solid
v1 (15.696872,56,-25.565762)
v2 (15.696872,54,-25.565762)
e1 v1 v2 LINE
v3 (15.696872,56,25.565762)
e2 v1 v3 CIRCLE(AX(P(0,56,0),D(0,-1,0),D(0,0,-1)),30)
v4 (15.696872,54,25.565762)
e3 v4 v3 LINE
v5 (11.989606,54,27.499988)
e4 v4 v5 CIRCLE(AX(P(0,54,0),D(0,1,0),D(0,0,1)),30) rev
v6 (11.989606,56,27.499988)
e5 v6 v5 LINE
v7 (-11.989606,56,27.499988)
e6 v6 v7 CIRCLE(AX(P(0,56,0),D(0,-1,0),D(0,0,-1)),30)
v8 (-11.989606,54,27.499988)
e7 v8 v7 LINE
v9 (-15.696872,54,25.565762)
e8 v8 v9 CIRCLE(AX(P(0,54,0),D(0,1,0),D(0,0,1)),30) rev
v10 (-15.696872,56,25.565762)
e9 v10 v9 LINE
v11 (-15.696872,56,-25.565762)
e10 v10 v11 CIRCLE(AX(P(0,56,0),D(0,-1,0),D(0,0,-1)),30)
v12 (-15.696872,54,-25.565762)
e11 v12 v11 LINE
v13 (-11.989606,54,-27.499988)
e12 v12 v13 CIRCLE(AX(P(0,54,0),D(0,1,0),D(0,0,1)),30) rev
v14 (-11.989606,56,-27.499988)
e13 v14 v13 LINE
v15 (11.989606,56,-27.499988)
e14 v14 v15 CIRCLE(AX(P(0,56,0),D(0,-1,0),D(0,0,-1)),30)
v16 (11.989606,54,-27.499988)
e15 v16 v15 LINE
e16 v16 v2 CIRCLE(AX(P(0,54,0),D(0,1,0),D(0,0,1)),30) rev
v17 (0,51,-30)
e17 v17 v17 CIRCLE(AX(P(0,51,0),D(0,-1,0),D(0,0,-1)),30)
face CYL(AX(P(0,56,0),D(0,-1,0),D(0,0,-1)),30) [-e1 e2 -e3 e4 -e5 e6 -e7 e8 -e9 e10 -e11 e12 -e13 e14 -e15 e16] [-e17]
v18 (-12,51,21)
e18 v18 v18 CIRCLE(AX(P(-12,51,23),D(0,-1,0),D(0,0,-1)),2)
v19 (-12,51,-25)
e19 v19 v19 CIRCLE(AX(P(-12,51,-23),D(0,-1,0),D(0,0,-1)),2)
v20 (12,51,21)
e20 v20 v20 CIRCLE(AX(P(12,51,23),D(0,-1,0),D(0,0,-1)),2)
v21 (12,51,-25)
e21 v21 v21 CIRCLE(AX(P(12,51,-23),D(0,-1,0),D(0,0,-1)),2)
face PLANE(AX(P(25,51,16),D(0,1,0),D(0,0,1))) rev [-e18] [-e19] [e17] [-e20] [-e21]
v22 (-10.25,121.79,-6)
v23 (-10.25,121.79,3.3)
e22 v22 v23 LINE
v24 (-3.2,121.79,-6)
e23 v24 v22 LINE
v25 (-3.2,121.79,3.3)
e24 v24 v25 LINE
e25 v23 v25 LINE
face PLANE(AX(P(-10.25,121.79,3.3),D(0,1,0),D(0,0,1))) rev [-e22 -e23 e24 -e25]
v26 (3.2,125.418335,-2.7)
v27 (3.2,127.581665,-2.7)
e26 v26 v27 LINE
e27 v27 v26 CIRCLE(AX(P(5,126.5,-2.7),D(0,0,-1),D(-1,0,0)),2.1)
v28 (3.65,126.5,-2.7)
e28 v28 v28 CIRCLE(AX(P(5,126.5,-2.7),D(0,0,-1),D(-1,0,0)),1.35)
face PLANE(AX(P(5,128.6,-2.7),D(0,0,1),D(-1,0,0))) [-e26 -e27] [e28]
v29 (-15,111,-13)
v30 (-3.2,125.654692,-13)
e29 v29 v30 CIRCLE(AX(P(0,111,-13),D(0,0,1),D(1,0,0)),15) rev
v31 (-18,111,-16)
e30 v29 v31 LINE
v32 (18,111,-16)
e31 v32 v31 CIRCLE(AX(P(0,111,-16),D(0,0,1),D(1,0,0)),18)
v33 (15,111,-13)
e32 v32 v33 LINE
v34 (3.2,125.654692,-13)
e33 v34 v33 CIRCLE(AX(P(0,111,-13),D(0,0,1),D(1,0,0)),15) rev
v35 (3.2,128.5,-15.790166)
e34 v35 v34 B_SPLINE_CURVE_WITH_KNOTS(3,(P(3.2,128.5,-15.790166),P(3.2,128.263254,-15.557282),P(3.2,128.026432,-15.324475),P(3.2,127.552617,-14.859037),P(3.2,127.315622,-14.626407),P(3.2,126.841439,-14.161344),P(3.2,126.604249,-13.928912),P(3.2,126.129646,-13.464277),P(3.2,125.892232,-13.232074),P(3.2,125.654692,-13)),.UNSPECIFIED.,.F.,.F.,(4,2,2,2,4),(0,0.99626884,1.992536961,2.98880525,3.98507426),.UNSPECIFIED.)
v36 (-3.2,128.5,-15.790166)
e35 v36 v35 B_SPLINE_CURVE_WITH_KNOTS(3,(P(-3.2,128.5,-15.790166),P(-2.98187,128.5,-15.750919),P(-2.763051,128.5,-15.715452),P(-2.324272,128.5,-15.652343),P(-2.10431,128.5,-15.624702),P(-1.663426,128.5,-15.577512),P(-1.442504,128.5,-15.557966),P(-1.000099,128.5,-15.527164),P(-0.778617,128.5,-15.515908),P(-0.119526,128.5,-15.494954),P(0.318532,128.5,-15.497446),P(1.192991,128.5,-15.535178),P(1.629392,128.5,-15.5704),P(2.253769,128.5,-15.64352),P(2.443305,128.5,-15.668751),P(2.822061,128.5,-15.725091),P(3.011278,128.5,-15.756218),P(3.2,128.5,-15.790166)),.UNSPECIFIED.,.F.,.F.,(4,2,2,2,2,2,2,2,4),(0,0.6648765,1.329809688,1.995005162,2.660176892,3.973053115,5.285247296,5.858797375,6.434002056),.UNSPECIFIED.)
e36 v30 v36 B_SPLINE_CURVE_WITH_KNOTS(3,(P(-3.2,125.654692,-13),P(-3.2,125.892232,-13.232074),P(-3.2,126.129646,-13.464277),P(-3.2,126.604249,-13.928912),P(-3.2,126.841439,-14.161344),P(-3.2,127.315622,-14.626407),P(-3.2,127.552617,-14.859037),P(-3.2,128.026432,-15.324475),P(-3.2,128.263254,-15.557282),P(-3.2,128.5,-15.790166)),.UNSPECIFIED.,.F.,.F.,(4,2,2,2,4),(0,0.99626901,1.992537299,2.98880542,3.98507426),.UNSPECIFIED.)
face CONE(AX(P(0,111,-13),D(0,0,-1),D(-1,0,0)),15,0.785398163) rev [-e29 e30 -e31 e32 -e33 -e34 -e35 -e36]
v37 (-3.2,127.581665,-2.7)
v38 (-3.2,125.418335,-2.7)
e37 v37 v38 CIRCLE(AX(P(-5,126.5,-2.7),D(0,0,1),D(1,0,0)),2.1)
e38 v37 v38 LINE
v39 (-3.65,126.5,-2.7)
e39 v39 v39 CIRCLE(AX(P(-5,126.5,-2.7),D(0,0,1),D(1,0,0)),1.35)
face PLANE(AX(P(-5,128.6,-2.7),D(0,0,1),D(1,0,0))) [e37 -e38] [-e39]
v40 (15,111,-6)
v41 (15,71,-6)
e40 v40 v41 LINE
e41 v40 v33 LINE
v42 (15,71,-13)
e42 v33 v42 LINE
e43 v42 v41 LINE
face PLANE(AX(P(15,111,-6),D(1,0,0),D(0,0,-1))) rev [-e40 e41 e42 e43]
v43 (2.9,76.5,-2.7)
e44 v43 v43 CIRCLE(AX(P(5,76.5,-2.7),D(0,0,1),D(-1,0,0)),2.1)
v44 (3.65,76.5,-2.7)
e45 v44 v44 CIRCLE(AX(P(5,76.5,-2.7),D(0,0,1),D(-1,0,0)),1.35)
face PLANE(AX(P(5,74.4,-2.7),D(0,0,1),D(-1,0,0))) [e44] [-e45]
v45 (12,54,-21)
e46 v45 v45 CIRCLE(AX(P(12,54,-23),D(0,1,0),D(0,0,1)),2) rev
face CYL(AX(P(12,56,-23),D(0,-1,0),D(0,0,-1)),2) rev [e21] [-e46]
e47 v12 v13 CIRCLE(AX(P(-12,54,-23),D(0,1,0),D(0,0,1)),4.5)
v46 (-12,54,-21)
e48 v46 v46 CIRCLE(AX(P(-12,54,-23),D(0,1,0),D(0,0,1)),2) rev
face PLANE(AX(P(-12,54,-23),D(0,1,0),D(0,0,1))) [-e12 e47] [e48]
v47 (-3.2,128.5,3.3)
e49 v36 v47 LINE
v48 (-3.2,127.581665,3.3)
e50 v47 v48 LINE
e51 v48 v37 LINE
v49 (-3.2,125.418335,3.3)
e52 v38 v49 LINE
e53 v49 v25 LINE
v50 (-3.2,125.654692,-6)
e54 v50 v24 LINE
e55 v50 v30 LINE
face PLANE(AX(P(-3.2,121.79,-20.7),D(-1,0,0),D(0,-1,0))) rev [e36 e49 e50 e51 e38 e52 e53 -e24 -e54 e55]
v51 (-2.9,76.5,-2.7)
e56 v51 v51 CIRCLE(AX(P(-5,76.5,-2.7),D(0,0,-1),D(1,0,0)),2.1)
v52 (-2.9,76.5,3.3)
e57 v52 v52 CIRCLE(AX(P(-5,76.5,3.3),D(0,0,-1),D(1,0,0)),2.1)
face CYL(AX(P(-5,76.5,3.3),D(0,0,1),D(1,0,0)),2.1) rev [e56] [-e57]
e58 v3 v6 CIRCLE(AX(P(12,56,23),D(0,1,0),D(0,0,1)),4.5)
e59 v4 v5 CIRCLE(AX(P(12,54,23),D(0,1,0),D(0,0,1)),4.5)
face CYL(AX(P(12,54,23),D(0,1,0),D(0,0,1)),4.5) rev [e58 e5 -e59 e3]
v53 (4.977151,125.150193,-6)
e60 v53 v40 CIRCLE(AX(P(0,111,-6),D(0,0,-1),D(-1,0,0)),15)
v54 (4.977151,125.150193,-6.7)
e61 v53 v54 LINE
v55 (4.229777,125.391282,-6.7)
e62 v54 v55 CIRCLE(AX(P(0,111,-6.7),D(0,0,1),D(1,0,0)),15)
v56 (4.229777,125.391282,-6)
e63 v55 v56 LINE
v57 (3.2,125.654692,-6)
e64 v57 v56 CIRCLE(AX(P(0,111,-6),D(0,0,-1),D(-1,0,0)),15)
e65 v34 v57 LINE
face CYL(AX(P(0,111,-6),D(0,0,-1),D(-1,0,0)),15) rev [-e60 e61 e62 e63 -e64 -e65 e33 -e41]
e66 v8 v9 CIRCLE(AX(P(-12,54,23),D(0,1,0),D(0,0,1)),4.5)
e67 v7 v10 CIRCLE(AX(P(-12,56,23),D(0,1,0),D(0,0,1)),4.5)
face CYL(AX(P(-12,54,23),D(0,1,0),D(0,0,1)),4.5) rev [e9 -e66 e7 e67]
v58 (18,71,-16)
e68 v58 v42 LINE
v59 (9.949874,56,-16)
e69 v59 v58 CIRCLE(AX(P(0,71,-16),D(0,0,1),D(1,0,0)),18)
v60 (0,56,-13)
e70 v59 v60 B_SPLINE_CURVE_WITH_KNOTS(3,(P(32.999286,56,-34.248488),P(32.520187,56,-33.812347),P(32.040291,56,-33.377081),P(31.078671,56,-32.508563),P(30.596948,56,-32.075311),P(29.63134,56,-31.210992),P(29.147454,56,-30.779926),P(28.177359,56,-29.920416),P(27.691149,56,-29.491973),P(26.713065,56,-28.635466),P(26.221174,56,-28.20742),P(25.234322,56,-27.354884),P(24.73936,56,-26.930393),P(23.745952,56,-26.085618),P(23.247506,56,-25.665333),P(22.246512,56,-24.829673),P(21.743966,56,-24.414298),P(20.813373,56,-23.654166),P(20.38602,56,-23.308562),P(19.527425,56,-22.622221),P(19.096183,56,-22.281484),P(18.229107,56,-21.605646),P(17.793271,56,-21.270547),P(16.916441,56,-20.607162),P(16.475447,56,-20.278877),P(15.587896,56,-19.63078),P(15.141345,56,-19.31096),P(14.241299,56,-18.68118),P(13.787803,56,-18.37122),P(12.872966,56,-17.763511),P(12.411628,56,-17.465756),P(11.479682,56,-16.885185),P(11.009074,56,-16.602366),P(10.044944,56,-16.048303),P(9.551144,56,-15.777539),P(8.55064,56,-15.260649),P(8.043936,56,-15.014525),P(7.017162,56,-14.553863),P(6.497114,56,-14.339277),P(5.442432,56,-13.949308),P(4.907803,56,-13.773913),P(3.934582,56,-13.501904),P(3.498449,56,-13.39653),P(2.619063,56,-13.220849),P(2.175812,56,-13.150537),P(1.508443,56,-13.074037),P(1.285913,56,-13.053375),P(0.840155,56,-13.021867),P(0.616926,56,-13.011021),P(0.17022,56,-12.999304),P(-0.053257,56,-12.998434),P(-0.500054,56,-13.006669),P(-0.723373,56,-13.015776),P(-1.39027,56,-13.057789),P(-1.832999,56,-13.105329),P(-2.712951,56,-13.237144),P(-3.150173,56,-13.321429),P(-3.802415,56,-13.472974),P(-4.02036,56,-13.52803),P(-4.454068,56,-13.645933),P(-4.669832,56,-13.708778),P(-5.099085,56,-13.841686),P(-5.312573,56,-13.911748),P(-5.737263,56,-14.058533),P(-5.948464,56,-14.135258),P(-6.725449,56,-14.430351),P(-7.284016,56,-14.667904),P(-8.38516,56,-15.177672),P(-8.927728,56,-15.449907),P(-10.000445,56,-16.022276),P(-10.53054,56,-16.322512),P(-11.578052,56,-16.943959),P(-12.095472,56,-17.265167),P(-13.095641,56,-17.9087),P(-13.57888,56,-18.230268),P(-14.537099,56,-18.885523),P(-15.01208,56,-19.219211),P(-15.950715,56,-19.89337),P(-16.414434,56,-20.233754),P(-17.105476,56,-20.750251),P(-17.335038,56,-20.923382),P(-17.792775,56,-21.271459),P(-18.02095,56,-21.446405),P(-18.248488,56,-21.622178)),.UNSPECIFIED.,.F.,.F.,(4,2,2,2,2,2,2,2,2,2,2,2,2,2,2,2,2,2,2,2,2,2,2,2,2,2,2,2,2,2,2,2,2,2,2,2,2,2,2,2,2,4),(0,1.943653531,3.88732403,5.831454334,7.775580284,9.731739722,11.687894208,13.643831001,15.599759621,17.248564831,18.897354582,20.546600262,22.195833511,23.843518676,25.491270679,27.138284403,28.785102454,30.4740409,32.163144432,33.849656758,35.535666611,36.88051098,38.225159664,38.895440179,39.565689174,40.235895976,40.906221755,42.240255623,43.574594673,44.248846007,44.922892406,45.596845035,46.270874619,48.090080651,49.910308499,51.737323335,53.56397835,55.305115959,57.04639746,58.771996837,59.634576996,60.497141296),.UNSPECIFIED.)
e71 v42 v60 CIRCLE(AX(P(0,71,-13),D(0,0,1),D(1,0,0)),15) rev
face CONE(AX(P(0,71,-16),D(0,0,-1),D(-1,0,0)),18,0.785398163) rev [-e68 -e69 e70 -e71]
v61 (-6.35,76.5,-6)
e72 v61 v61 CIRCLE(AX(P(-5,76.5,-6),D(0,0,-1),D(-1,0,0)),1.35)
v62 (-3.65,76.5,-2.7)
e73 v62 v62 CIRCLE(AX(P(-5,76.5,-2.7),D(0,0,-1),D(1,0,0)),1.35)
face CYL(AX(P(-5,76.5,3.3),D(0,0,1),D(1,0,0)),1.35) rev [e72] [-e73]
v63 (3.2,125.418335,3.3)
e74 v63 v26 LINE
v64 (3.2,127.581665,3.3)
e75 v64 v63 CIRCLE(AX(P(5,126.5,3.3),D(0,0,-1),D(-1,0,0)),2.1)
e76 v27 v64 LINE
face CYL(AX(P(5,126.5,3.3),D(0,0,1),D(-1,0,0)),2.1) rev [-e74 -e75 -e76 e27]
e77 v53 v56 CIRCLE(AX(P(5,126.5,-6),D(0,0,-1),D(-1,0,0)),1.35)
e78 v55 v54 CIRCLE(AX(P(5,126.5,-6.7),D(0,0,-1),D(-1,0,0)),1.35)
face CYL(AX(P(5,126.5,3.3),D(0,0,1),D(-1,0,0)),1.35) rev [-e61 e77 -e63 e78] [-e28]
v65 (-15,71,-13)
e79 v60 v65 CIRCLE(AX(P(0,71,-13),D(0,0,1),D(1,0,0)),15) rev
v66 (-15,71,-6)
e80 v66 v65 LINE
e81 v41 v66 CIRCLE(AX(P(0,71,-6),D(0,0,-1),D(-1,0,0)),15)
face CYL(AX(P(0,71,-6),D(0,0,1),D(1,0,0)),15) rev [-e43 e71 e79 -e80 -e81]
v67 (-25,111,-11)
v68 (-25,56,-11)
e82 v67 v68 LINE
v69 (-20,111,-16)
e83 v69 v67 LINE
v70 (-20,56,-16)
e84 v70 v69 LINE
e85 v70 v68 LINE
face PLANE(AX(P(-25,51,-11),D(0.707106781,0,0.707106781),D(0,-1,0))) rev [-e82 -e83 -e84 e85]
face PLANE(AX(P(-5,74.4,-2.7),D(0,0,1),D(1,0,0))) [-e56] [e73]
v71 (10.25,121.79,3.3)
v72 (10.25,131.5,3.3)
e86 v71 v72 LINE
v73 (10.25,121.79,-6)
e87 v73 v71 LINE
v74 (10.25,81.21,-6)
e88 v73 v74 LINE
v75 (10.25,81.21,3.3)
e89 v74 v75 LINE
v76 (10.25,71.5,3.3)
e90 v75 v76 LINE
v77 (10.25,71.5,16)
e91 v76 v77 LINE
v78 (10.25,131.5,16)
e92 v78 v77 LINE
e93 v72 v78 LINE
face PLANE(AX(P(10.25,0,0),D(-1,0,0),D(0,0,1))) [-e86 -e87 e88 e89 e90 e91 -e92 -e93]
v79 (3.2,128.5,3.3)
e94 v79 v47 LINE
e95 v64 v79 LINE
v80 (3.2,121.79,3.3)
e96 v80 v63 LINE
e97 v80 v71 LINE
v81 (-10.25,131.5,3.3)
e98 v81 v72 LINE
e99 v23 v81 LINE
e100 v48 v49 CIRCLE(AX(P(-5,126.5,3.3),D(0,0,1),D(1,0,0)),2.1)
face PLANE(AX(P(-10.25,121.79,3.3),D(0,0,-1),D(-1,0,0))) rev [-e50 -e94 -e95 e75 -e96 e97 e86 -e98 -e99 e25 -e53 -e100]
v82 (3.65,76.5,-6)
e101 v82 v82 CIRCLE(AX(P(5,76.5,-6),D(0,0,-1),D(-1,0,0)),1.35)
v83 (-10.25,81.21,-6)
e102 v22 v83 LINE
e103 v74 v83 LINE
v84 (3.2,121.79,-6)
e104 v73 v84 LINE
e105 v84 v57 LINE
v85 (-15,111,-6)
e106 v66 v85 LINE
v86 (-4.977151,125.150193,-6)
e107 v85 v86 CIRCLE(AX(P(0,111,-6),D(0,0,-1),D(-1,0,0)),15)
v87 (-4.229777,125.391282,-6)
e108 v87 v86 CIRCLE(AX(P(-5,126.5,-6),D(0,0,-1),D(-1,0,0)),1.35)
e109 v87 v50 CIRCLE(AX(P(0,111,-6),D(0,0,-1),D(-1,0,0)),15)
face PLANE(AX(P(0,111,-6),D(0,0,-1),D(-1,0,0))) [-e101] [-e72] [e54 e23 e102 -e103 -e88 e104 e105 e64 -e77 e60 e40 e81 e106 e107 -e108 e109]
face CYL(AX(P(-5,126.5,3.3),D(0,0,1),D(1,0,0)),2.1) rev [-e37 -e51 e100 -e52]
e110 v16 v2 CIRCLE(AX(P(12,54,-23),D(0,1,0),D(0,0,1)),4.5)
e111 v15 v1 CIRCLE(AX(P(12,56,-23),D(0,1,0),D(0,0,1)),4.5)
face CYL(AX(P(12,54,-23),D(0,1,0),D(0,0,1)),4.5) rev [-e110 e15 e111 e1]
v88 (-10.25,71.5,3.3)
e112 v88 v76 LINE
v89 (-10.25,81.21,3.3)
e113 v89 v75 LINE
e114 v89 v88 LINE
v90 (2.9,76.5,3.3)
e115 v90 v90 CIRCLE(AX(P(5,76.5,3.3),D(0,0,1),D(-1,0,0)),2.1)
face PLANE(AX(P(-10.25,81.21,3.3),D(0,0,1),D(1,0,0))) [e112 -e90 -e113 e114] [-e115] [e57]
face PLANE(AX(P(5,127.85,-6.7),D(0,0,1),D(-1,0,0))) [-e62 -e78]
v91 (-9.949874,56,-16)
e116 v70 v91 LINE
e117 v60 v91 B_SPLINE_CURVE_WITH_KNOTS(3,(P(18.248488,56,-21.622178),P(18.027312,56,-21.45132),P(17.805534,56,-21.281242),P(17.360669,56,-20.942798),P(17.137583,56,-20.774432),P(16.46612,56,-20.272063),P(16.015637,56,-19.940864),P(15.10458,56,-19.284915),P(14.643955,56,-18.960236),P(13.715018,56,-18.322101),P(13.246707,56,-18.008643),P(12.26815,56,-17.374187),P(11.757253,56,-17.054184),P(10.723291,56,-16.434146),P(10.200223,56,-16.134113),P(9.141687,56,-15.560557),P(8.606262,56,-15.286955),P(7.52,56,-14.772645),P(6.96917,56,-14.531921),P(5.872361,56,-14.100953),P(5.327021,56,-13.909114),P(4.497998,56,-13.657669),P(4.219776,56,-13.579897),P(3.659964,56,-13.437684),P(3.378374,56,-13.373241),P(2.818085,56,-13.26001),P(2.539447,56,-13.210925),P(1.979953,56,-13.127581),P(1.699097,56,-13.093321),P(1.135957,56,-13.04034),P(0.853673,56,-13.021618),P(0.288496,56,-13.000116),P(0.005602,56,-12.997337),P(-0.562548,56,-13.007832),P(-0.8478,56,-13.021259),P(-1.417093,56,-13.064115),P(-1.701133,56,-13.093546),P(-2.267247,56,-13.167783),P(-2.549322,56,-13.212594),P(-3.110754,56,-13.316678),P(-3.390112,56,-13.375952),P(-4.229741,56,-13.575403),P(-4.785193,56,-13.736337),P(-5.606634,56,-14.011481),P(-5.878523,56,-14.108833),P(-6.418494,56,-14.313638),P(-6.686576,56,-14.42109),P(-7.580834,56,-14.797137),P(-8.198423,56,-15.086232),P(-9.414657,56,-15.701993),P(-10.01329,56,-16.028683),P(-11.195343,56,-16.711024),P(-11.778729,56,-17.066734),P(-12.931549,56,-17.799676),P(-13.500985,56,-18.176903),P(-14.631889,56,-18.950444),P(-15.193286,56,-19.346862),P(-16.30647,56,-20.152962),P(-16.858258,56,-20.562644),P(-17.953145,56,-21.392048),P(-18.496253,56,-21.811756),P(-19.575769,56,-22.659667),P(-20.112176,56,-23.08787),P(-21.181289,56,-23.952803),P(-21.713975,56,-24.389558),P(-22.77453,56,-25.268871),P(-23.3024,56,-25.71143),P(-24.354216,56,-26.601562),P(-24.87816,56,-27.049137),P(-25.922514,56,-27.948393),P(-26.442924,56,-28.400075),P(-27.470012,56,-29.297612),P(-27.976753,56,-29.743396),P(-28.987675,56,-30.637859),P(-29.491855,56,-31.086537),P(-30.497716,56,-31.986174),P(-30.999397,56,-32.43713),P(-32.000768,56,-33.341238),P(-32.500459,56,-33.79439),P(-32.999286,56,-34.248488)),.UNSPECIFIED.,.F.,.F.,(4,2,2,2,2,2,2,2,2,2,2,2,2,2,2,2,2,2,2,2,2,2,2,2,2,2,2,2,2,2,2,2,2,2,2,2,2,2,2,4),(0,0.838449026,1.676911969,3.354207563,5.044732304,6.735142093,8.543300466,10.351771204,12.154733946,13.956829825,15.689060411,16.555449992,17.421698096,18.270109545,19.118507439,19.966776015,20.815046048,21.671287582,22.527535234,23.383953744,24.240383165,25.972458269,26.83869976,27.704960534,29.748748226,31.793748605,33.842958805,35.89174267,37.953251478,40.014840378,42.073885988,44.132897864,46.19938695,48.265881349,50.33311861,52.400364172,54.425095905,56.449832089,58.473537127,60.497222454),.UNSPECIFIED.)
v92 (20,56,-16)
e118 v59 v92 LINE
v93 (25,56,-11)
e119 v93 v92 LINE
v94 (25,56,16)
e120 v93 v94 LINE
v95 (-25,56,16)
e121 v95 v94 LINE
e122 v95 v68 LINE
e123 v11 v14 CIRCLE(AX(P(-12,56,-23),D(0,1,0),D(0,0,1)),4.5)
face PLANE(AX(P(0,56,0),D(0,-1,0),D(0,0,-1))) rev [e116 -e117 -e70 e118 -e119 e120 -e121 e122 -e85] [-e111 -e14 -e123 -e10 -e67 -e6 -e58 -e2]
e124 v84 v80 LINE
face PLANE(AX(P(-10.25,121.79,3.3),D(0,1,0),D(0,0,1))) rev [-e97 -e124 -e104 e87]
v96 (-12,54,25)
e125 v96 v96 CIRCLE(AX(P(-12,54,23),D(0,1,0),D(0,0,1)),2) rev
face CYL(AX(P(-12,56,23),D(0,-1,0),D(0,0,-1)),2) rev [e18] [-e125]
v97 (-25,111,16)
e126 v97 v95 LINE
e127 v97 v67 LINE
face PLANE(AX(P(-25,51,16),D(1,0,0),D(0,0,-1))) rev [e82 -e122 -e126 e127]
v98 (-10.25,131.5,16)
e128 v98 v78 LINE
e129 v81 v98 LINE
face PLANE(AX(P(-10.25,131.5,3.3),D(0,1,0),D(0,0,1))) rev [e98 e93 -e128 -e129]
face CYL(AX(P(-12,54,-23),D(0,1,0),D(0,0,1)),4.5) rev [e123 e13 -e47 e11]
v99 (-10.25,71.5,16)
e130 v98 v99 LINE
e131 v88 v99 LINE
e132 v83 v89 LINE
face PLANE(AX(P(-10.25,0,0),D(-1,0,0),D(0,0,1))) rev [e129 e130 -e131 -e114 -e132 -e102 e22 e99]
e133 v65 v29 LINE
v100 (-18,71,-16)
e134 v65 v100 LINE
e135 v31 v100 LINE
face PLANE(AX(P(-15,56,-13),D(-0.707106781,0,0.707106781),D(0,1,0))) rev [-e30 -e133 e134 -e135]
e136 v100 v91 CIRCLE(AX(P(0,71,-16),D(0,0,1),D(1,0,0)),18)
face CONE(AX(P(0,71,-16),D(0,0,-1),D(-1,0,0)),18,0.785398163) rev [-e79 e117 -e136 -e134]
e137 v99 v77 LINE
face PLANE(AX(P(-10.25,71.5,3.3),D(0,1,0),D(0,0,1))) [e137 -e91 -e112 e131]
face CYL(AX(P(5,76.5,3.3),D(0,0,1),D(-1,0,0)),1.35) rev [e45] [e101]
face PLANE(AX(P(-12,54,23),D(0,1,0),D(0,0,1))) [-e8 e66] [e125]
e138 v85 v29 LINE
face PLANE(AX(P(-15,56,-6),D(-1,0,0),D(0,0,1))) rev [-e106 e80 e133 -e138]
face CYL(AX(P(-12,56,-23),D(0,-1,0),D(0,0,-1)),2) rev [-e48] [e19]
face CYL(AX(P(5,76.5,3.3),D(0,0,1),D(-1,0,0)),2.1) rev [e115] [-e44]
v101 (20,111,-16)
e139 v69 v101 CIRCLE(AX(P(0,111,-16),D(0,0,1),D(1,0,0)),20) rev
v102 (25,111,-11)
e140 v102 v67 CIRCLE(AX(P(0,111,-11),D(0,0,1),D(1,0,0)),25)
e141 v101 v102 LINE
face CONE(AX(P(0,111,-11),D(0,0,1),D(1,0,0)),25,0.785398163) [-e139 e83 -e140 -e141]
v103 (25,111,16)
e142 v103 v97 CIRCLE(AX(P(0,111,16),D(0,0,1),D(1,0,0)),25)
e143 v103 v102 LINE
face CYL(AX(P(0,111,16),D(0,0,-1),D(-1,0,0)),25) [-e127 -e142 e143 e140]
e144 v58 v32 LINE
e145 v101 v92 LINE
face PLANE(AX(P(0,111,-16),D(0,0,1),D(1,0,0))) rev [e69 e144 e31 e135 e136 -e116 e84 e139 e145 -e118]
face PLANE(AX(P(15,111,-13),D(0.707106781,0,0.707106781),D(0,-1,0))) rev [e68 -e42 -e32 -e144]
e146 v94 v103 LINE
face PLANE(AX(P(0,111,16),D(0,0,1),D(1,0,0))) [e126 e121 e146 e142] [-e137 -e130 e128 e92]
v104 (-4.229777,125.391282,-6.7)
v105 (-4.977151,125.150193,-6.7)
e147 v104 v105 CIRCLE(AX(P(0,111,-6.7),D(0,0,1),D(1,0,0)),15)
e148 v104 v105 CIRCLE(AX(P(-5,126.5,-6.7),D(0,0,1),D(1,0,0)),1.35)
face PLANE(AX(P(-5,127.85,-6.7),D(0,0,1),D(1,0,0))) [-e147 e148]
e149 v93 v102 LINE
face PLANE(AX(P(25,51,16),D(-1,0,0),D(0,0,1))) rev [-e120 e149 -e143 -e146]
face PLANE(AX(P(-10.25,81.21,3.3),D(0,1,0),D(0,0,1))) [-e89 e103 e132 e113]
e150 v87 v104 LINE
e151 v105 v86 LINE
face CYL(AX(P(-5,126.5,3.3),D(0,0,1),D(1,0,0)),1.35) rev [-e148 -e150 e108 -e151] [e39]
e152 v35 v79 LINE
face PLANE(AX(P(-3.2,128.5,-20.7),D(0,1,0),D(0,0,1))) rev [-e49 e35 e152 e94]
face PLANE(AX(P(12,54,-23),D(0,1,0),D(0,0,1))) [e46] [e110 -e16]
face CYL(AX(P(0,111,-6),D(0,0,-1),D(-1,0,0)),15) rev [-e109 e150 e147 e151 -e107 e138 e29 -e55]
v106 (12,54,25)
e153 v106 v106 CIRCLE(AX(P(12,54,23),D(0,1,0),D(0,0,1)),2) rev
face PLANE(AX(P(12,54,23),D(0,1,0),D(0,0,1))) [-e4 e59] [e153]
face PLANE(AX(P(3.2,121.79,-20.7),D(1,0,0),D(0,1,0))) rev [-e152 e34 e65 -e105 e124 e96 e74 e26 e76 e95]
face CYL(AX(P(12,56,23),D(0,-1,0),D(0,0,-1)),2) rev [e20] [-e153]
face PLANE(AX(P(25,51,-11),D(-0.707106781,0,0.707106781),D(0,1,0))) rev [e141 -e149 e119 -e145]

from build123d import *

# Parameters (mm, degrees)
BOSS_EXTRUDE1_DEPTH = 16
CHAMFER1_SIZE       = 5
CUT_EXTRUDE1_DEPTH  = 10.25
SKETCH5_W           = 6.4
SKETCH5_H           = 6.71
CUT_EXTRUDE2_DEPTH  = 24
CUT_EXTRUDE3_DEPTH  = 10
FILLET1_R           = 15
CHAMFER2_SIZE       = 3
SKETCH7_R           = 30
SKETCH7_R_2         = 2
BOSS_EXTRUDE2_DEPTH = 5
SKETCH8_R           = 4.5
CUT_EXTRUDE4_DEPTH  = 2


# Some blends are built 0.0001 mm under size
with BuildPart() as part:
    # Sketch1 → Boss-Extrude1 (new, symmetric)
    with BuildSketch(Plane.XY):
        with BuildLine():
            Line((25, 51), (-25, 51))
            Line((-25, 51), (-25, 111))
            ThreePointArc((-25, 111), (0, 136), (25, 111))
            Line((25, 111), (25, 51))
        make_face()
    extrude(amount=BOSS_EXTRUDE1_DEPTH, both=True)

    # Chamfer1
    chamfer1_edges = [part.edges().sort_by_distance(p)[0] for p in [
        (25, 81, -16),
        (-25, 81, -16),
        (0, 136, -16),
    ]]
    chamfer(chamfer1_edges, length=CHAMFER1_SIZE)

    # Sketch3 → Cut-Extrude1 (cut, symmetric)
    with BuildSketch(Plane(origin=(0, 0, 0), x_dir=(0, 0, -1), z_dir=(1, 0, 0))):
        Polygon((-3.3, 121.79), (-3.3, 131.5), (-16, 131.5), (-16, 101.5), (16, 101.5), (16, 121.79), align=None)
    cut_extrude1 = extrude(amount=CUT_EXTRUDE1_DEPTH, both=True, mode=Mode.SUBTRACT)

    # Sketch4 → Cut-Revolve1 (revolve, cut)
    with BuildSketch(Plane(origin=(-5, 0, 0), x_dir=(0, 0, -1), z_dir=(1, 0, 0)), mode=Mode.PRIVATE) as cut_revolve1_sk:
        Polygon((-3.3, 126.5), (6.7, 126.5), (6.7, 127.85), (2.7, 127.85), (2.7, 128.6), (-3.3, 128.6), align=None)
    cut_revolve1 = revolve(cut_revolve1_sk.sketch.rotate(Axis((-5, 126.5, 3.3), (0, 0, -1)), 90), axis=Axis((-5, 126.5, 3.3), (0, 0, -1)), mode=Mode.SUBTRACT)

    # Mirror1: Cut-Revolve1 across plane
    add(cut_revolve1.mirror(Plane(origin=(0, 0, 0), x_dir=(0, 0, 1), z_dir=(1, 0, 0))), mode=Mode.SUBTRACT)

    # Mirror2: Cut-Extrude1, Cut-Revolve1 across plane
    add(cut_extrude1.mirror(Plane(origin=(-10.25, 101.5, -16), x_dir=(0, 0, 1), z_dir=(0, -1, 0))), mode=Mode.SUBTRACT)
    add(cut_revolve1.mirror(Plane(origin=(-10.25, 101.5, -16), x_dir=(0, 0, 1), z_dir=(0, -1, 0))), mode=Mode.SUBTRACT)

    # Mirror2 copy 1 sketch → Mirror2 copy 1 (revolve, cut)
    with BuildSketch(Plane(origin=(5, 203, 0), x_dir=(0, 0, -1), z_dir=(-1, 0, 0))):
        Polygon((-3.3, 126.5), (6.7, 126.5), (6.7, 127.85), (2.7, 127.85), (2.7, 128.6), (-3.3, 128.6), align=None)
    revolve(axis=Axis((5, 76.5, 3.3), (0, 0, -1)), mode=Mode.SUBTRACT)

    # Sketch5 → Cut-Extrude2 (cut)
    with BuildSketch(Plane.XY.offset(3.3)):
        with Locations((0, 125.145)):
            Rectangle(SKETCH5_W, SKETCH5_H)
    extrude(amount=-CUT_EXTRUDE2_DEPTH, mode=Mode.SUBTRACT)

    # Sketch6 → Cut-Extrude3 (cut)
    with BuildSketch(Plane(origin=(0, 0, -16), x_dir=(-1, 0, 0), z_dir=(0, 0, -1))):
        with BuildLine():
            Line((-15, 111), (-15, 56))
            Line((-15, 56), (15, 56))
            Line((15, 56), (15, 111))
            ThreePointArc((15, 111), (0, 126), (-15, 111))
        make_face()
    extrude(amount=-CUT_EXTRUDE3_DEPTH, mode=Mode.SUBTRACT)

    # Fillet1
    fillet1_edges = [part.edges().sort_by_distance(p)[0] for p in [
        (-15, 56, -11),
        (15, 56, -11),
    ]]
    fillet(fillet1_edges, radius=FILLET1_R - 0.0001)  # a hair under: the kernel refuses the full size

    # Chamfer2
    # the kernel refuses this chamfer: 3 mm, written as the material it takes off along each edge
    with BuildSketch(Plane(origin=(-15, 70.9999, -16), x_dir=(-0.9996219169112965, 0, -0.02749587661058676), z_dir=(0, 1, 0)), Plane(origin=(15, 111, -16), x_dir=(0.9996219169112965, 0, -0.02749587661058676), z_dir=(0, -1, 0))) as chamfer2_piece_1:
        Polygon((CHAMFER2_SIZE * 0.999621916911, CHAMFER2_SIZE * 0.0274958766106), (-CHAMFER2_SIZE * 0.0274958766106, CHAMFER2_SIZE * 0.999621916911), (0, 0), align=None)
    extrude(amount=40.0001, mode=Mode.SUBTRACT)
    with BuildSketch(Plane(origin=(-0.0001, 70.9999, -16), x_dir=(0, -1, 0), z_dir=(1, 0, 0))) as chamfer2_piece_2:
        Polygon((14.9999 + CHAMFER2_SIZE, 0), (14.9999, -CHAMFER2_SIZE), (14.9999, 0), align=None)
    revolve(axis=Axis((-0.0001, 70.9999, -16), (0, 0, -1)), revolution_arc=90, mode=Mode.SUBTRACT)
    with BuildSketch(Plane(origin=(0, 111, -16), x_dir=(-0.29504722278554535, 0.955482671913278, 0), z_dir=(-0.955482671913278, -0.29504722278554535, 0))) as chamfer2_piece_3:
        Polygon((15 + CHAMFER2_SIZE, 0), (15, -CHAMFER2_SIZE), (15, 0), align=None)
    revolve(axis=Axis((0, 111, -16), (0, 0, -1)), revolution_arc=107.160369077, mode=Mode.SUBTRACT)
    with BuildSketch(Plane(origin=(0.0001, 70.9999, -16), x_dir=(1, 0, 0), z_dir=(0, 1, 0))) as chamfer2_piece_4:
        Polygon((14.9999 + CHAMFER2_SIZE, 0), (14.9999, -CHAMFER2_SIZE), (14.9999, 0), align=None)
    revolve(axis=Axis((0.0001, 70.9999, -16), (0, 0, -1)), revolution_arc=90, mode=Mode.SUBTRACT)
    with BuildSketch(Plane(origin=(0.0001, 56, -16), x_dir=(0, -0.9996219169112965, -0.02749587661058676), z_dir=(-1, 0, 0))) as chamfer2_piece_5:
        Polygon((CHAMFER2_SIZE * 0.999621916911, CHAMFER2_SIZE * 0.0274958766106), (-CHAMFER2_SIZE * 0.0274958766106, CHAMFER2_SIZE * 0.999621916911), (0, 0), align=None)
    extrude(amount=0.0002, mode=Mode.SUBTRACT)
    with BuildSketch(Plane(origin=(0, 111, -16), x_dir=(-1, 0, 0), z_dir=(0, -1, 0))) as chamfer2_piece_6:
        Polygon((15 + CHAMFER2_SIZE, 0), (15, -CHAMFER2_SIZE), (15, 0), align=None)
    revolve(axis=Axis((0, 111, -16), (0, 0, -1)), revolution_arc=107.160369077, mode=Mode.SUBTRACT)

    # Sketch7 → Boss-Extrude2 (add)
    with BuildSketch(Plane.XZ.offset(-51)):
        with Locations(Location((0, 0, 0), (0, 0, 270))):
            Circle(SKETCH7_R)
        with Locations(Location((-12, -23, 0), (0, 0, 270))):
            Circle(SKETCH7_R_2, mode=Mode.SUBTRACT)
        with Locations(Location((12, -23, 0), (0, 0, 270))):
            Circle(SKETCH7_R_2, mode=Mode.SUBTRACT)
        with Locations(Location((-12, 23, 0), (0, 0, 270))):
            Circle(SKETCH7_R_2, mode=Mode.SUBTRACT)
        with Locations(Location((12, 23, 0), (0, 0, 270))):
            Circle(SKETCH7_R_2, mode=Mode.SUBTRACT)
    extrude(amount=-BOSS_EXTRUDE2_DEPTH)

    # Sketch8 → Cut-Extrude4 (cut)
    with BuildSketch(Plane(origin=(0, 56, 0), x_dir=(1, 0, 0), z_dir=(0, 1, 0))):
        with Locations((12, 23)):
            Circle(SKETCH8_R)
        with Locations((-12, 23)):
            Circle(SKETCH8_R)
        with Locations((-12, -23)):
            Circle(SKETCH8_R)
        with Locations((12, -23)):
            Circle(SKETCH8_R)
    extrude(amount=-CUT_EXTRUDE4_DEPTH, mode=Mode.SUBTRACT)


solid = part.part
